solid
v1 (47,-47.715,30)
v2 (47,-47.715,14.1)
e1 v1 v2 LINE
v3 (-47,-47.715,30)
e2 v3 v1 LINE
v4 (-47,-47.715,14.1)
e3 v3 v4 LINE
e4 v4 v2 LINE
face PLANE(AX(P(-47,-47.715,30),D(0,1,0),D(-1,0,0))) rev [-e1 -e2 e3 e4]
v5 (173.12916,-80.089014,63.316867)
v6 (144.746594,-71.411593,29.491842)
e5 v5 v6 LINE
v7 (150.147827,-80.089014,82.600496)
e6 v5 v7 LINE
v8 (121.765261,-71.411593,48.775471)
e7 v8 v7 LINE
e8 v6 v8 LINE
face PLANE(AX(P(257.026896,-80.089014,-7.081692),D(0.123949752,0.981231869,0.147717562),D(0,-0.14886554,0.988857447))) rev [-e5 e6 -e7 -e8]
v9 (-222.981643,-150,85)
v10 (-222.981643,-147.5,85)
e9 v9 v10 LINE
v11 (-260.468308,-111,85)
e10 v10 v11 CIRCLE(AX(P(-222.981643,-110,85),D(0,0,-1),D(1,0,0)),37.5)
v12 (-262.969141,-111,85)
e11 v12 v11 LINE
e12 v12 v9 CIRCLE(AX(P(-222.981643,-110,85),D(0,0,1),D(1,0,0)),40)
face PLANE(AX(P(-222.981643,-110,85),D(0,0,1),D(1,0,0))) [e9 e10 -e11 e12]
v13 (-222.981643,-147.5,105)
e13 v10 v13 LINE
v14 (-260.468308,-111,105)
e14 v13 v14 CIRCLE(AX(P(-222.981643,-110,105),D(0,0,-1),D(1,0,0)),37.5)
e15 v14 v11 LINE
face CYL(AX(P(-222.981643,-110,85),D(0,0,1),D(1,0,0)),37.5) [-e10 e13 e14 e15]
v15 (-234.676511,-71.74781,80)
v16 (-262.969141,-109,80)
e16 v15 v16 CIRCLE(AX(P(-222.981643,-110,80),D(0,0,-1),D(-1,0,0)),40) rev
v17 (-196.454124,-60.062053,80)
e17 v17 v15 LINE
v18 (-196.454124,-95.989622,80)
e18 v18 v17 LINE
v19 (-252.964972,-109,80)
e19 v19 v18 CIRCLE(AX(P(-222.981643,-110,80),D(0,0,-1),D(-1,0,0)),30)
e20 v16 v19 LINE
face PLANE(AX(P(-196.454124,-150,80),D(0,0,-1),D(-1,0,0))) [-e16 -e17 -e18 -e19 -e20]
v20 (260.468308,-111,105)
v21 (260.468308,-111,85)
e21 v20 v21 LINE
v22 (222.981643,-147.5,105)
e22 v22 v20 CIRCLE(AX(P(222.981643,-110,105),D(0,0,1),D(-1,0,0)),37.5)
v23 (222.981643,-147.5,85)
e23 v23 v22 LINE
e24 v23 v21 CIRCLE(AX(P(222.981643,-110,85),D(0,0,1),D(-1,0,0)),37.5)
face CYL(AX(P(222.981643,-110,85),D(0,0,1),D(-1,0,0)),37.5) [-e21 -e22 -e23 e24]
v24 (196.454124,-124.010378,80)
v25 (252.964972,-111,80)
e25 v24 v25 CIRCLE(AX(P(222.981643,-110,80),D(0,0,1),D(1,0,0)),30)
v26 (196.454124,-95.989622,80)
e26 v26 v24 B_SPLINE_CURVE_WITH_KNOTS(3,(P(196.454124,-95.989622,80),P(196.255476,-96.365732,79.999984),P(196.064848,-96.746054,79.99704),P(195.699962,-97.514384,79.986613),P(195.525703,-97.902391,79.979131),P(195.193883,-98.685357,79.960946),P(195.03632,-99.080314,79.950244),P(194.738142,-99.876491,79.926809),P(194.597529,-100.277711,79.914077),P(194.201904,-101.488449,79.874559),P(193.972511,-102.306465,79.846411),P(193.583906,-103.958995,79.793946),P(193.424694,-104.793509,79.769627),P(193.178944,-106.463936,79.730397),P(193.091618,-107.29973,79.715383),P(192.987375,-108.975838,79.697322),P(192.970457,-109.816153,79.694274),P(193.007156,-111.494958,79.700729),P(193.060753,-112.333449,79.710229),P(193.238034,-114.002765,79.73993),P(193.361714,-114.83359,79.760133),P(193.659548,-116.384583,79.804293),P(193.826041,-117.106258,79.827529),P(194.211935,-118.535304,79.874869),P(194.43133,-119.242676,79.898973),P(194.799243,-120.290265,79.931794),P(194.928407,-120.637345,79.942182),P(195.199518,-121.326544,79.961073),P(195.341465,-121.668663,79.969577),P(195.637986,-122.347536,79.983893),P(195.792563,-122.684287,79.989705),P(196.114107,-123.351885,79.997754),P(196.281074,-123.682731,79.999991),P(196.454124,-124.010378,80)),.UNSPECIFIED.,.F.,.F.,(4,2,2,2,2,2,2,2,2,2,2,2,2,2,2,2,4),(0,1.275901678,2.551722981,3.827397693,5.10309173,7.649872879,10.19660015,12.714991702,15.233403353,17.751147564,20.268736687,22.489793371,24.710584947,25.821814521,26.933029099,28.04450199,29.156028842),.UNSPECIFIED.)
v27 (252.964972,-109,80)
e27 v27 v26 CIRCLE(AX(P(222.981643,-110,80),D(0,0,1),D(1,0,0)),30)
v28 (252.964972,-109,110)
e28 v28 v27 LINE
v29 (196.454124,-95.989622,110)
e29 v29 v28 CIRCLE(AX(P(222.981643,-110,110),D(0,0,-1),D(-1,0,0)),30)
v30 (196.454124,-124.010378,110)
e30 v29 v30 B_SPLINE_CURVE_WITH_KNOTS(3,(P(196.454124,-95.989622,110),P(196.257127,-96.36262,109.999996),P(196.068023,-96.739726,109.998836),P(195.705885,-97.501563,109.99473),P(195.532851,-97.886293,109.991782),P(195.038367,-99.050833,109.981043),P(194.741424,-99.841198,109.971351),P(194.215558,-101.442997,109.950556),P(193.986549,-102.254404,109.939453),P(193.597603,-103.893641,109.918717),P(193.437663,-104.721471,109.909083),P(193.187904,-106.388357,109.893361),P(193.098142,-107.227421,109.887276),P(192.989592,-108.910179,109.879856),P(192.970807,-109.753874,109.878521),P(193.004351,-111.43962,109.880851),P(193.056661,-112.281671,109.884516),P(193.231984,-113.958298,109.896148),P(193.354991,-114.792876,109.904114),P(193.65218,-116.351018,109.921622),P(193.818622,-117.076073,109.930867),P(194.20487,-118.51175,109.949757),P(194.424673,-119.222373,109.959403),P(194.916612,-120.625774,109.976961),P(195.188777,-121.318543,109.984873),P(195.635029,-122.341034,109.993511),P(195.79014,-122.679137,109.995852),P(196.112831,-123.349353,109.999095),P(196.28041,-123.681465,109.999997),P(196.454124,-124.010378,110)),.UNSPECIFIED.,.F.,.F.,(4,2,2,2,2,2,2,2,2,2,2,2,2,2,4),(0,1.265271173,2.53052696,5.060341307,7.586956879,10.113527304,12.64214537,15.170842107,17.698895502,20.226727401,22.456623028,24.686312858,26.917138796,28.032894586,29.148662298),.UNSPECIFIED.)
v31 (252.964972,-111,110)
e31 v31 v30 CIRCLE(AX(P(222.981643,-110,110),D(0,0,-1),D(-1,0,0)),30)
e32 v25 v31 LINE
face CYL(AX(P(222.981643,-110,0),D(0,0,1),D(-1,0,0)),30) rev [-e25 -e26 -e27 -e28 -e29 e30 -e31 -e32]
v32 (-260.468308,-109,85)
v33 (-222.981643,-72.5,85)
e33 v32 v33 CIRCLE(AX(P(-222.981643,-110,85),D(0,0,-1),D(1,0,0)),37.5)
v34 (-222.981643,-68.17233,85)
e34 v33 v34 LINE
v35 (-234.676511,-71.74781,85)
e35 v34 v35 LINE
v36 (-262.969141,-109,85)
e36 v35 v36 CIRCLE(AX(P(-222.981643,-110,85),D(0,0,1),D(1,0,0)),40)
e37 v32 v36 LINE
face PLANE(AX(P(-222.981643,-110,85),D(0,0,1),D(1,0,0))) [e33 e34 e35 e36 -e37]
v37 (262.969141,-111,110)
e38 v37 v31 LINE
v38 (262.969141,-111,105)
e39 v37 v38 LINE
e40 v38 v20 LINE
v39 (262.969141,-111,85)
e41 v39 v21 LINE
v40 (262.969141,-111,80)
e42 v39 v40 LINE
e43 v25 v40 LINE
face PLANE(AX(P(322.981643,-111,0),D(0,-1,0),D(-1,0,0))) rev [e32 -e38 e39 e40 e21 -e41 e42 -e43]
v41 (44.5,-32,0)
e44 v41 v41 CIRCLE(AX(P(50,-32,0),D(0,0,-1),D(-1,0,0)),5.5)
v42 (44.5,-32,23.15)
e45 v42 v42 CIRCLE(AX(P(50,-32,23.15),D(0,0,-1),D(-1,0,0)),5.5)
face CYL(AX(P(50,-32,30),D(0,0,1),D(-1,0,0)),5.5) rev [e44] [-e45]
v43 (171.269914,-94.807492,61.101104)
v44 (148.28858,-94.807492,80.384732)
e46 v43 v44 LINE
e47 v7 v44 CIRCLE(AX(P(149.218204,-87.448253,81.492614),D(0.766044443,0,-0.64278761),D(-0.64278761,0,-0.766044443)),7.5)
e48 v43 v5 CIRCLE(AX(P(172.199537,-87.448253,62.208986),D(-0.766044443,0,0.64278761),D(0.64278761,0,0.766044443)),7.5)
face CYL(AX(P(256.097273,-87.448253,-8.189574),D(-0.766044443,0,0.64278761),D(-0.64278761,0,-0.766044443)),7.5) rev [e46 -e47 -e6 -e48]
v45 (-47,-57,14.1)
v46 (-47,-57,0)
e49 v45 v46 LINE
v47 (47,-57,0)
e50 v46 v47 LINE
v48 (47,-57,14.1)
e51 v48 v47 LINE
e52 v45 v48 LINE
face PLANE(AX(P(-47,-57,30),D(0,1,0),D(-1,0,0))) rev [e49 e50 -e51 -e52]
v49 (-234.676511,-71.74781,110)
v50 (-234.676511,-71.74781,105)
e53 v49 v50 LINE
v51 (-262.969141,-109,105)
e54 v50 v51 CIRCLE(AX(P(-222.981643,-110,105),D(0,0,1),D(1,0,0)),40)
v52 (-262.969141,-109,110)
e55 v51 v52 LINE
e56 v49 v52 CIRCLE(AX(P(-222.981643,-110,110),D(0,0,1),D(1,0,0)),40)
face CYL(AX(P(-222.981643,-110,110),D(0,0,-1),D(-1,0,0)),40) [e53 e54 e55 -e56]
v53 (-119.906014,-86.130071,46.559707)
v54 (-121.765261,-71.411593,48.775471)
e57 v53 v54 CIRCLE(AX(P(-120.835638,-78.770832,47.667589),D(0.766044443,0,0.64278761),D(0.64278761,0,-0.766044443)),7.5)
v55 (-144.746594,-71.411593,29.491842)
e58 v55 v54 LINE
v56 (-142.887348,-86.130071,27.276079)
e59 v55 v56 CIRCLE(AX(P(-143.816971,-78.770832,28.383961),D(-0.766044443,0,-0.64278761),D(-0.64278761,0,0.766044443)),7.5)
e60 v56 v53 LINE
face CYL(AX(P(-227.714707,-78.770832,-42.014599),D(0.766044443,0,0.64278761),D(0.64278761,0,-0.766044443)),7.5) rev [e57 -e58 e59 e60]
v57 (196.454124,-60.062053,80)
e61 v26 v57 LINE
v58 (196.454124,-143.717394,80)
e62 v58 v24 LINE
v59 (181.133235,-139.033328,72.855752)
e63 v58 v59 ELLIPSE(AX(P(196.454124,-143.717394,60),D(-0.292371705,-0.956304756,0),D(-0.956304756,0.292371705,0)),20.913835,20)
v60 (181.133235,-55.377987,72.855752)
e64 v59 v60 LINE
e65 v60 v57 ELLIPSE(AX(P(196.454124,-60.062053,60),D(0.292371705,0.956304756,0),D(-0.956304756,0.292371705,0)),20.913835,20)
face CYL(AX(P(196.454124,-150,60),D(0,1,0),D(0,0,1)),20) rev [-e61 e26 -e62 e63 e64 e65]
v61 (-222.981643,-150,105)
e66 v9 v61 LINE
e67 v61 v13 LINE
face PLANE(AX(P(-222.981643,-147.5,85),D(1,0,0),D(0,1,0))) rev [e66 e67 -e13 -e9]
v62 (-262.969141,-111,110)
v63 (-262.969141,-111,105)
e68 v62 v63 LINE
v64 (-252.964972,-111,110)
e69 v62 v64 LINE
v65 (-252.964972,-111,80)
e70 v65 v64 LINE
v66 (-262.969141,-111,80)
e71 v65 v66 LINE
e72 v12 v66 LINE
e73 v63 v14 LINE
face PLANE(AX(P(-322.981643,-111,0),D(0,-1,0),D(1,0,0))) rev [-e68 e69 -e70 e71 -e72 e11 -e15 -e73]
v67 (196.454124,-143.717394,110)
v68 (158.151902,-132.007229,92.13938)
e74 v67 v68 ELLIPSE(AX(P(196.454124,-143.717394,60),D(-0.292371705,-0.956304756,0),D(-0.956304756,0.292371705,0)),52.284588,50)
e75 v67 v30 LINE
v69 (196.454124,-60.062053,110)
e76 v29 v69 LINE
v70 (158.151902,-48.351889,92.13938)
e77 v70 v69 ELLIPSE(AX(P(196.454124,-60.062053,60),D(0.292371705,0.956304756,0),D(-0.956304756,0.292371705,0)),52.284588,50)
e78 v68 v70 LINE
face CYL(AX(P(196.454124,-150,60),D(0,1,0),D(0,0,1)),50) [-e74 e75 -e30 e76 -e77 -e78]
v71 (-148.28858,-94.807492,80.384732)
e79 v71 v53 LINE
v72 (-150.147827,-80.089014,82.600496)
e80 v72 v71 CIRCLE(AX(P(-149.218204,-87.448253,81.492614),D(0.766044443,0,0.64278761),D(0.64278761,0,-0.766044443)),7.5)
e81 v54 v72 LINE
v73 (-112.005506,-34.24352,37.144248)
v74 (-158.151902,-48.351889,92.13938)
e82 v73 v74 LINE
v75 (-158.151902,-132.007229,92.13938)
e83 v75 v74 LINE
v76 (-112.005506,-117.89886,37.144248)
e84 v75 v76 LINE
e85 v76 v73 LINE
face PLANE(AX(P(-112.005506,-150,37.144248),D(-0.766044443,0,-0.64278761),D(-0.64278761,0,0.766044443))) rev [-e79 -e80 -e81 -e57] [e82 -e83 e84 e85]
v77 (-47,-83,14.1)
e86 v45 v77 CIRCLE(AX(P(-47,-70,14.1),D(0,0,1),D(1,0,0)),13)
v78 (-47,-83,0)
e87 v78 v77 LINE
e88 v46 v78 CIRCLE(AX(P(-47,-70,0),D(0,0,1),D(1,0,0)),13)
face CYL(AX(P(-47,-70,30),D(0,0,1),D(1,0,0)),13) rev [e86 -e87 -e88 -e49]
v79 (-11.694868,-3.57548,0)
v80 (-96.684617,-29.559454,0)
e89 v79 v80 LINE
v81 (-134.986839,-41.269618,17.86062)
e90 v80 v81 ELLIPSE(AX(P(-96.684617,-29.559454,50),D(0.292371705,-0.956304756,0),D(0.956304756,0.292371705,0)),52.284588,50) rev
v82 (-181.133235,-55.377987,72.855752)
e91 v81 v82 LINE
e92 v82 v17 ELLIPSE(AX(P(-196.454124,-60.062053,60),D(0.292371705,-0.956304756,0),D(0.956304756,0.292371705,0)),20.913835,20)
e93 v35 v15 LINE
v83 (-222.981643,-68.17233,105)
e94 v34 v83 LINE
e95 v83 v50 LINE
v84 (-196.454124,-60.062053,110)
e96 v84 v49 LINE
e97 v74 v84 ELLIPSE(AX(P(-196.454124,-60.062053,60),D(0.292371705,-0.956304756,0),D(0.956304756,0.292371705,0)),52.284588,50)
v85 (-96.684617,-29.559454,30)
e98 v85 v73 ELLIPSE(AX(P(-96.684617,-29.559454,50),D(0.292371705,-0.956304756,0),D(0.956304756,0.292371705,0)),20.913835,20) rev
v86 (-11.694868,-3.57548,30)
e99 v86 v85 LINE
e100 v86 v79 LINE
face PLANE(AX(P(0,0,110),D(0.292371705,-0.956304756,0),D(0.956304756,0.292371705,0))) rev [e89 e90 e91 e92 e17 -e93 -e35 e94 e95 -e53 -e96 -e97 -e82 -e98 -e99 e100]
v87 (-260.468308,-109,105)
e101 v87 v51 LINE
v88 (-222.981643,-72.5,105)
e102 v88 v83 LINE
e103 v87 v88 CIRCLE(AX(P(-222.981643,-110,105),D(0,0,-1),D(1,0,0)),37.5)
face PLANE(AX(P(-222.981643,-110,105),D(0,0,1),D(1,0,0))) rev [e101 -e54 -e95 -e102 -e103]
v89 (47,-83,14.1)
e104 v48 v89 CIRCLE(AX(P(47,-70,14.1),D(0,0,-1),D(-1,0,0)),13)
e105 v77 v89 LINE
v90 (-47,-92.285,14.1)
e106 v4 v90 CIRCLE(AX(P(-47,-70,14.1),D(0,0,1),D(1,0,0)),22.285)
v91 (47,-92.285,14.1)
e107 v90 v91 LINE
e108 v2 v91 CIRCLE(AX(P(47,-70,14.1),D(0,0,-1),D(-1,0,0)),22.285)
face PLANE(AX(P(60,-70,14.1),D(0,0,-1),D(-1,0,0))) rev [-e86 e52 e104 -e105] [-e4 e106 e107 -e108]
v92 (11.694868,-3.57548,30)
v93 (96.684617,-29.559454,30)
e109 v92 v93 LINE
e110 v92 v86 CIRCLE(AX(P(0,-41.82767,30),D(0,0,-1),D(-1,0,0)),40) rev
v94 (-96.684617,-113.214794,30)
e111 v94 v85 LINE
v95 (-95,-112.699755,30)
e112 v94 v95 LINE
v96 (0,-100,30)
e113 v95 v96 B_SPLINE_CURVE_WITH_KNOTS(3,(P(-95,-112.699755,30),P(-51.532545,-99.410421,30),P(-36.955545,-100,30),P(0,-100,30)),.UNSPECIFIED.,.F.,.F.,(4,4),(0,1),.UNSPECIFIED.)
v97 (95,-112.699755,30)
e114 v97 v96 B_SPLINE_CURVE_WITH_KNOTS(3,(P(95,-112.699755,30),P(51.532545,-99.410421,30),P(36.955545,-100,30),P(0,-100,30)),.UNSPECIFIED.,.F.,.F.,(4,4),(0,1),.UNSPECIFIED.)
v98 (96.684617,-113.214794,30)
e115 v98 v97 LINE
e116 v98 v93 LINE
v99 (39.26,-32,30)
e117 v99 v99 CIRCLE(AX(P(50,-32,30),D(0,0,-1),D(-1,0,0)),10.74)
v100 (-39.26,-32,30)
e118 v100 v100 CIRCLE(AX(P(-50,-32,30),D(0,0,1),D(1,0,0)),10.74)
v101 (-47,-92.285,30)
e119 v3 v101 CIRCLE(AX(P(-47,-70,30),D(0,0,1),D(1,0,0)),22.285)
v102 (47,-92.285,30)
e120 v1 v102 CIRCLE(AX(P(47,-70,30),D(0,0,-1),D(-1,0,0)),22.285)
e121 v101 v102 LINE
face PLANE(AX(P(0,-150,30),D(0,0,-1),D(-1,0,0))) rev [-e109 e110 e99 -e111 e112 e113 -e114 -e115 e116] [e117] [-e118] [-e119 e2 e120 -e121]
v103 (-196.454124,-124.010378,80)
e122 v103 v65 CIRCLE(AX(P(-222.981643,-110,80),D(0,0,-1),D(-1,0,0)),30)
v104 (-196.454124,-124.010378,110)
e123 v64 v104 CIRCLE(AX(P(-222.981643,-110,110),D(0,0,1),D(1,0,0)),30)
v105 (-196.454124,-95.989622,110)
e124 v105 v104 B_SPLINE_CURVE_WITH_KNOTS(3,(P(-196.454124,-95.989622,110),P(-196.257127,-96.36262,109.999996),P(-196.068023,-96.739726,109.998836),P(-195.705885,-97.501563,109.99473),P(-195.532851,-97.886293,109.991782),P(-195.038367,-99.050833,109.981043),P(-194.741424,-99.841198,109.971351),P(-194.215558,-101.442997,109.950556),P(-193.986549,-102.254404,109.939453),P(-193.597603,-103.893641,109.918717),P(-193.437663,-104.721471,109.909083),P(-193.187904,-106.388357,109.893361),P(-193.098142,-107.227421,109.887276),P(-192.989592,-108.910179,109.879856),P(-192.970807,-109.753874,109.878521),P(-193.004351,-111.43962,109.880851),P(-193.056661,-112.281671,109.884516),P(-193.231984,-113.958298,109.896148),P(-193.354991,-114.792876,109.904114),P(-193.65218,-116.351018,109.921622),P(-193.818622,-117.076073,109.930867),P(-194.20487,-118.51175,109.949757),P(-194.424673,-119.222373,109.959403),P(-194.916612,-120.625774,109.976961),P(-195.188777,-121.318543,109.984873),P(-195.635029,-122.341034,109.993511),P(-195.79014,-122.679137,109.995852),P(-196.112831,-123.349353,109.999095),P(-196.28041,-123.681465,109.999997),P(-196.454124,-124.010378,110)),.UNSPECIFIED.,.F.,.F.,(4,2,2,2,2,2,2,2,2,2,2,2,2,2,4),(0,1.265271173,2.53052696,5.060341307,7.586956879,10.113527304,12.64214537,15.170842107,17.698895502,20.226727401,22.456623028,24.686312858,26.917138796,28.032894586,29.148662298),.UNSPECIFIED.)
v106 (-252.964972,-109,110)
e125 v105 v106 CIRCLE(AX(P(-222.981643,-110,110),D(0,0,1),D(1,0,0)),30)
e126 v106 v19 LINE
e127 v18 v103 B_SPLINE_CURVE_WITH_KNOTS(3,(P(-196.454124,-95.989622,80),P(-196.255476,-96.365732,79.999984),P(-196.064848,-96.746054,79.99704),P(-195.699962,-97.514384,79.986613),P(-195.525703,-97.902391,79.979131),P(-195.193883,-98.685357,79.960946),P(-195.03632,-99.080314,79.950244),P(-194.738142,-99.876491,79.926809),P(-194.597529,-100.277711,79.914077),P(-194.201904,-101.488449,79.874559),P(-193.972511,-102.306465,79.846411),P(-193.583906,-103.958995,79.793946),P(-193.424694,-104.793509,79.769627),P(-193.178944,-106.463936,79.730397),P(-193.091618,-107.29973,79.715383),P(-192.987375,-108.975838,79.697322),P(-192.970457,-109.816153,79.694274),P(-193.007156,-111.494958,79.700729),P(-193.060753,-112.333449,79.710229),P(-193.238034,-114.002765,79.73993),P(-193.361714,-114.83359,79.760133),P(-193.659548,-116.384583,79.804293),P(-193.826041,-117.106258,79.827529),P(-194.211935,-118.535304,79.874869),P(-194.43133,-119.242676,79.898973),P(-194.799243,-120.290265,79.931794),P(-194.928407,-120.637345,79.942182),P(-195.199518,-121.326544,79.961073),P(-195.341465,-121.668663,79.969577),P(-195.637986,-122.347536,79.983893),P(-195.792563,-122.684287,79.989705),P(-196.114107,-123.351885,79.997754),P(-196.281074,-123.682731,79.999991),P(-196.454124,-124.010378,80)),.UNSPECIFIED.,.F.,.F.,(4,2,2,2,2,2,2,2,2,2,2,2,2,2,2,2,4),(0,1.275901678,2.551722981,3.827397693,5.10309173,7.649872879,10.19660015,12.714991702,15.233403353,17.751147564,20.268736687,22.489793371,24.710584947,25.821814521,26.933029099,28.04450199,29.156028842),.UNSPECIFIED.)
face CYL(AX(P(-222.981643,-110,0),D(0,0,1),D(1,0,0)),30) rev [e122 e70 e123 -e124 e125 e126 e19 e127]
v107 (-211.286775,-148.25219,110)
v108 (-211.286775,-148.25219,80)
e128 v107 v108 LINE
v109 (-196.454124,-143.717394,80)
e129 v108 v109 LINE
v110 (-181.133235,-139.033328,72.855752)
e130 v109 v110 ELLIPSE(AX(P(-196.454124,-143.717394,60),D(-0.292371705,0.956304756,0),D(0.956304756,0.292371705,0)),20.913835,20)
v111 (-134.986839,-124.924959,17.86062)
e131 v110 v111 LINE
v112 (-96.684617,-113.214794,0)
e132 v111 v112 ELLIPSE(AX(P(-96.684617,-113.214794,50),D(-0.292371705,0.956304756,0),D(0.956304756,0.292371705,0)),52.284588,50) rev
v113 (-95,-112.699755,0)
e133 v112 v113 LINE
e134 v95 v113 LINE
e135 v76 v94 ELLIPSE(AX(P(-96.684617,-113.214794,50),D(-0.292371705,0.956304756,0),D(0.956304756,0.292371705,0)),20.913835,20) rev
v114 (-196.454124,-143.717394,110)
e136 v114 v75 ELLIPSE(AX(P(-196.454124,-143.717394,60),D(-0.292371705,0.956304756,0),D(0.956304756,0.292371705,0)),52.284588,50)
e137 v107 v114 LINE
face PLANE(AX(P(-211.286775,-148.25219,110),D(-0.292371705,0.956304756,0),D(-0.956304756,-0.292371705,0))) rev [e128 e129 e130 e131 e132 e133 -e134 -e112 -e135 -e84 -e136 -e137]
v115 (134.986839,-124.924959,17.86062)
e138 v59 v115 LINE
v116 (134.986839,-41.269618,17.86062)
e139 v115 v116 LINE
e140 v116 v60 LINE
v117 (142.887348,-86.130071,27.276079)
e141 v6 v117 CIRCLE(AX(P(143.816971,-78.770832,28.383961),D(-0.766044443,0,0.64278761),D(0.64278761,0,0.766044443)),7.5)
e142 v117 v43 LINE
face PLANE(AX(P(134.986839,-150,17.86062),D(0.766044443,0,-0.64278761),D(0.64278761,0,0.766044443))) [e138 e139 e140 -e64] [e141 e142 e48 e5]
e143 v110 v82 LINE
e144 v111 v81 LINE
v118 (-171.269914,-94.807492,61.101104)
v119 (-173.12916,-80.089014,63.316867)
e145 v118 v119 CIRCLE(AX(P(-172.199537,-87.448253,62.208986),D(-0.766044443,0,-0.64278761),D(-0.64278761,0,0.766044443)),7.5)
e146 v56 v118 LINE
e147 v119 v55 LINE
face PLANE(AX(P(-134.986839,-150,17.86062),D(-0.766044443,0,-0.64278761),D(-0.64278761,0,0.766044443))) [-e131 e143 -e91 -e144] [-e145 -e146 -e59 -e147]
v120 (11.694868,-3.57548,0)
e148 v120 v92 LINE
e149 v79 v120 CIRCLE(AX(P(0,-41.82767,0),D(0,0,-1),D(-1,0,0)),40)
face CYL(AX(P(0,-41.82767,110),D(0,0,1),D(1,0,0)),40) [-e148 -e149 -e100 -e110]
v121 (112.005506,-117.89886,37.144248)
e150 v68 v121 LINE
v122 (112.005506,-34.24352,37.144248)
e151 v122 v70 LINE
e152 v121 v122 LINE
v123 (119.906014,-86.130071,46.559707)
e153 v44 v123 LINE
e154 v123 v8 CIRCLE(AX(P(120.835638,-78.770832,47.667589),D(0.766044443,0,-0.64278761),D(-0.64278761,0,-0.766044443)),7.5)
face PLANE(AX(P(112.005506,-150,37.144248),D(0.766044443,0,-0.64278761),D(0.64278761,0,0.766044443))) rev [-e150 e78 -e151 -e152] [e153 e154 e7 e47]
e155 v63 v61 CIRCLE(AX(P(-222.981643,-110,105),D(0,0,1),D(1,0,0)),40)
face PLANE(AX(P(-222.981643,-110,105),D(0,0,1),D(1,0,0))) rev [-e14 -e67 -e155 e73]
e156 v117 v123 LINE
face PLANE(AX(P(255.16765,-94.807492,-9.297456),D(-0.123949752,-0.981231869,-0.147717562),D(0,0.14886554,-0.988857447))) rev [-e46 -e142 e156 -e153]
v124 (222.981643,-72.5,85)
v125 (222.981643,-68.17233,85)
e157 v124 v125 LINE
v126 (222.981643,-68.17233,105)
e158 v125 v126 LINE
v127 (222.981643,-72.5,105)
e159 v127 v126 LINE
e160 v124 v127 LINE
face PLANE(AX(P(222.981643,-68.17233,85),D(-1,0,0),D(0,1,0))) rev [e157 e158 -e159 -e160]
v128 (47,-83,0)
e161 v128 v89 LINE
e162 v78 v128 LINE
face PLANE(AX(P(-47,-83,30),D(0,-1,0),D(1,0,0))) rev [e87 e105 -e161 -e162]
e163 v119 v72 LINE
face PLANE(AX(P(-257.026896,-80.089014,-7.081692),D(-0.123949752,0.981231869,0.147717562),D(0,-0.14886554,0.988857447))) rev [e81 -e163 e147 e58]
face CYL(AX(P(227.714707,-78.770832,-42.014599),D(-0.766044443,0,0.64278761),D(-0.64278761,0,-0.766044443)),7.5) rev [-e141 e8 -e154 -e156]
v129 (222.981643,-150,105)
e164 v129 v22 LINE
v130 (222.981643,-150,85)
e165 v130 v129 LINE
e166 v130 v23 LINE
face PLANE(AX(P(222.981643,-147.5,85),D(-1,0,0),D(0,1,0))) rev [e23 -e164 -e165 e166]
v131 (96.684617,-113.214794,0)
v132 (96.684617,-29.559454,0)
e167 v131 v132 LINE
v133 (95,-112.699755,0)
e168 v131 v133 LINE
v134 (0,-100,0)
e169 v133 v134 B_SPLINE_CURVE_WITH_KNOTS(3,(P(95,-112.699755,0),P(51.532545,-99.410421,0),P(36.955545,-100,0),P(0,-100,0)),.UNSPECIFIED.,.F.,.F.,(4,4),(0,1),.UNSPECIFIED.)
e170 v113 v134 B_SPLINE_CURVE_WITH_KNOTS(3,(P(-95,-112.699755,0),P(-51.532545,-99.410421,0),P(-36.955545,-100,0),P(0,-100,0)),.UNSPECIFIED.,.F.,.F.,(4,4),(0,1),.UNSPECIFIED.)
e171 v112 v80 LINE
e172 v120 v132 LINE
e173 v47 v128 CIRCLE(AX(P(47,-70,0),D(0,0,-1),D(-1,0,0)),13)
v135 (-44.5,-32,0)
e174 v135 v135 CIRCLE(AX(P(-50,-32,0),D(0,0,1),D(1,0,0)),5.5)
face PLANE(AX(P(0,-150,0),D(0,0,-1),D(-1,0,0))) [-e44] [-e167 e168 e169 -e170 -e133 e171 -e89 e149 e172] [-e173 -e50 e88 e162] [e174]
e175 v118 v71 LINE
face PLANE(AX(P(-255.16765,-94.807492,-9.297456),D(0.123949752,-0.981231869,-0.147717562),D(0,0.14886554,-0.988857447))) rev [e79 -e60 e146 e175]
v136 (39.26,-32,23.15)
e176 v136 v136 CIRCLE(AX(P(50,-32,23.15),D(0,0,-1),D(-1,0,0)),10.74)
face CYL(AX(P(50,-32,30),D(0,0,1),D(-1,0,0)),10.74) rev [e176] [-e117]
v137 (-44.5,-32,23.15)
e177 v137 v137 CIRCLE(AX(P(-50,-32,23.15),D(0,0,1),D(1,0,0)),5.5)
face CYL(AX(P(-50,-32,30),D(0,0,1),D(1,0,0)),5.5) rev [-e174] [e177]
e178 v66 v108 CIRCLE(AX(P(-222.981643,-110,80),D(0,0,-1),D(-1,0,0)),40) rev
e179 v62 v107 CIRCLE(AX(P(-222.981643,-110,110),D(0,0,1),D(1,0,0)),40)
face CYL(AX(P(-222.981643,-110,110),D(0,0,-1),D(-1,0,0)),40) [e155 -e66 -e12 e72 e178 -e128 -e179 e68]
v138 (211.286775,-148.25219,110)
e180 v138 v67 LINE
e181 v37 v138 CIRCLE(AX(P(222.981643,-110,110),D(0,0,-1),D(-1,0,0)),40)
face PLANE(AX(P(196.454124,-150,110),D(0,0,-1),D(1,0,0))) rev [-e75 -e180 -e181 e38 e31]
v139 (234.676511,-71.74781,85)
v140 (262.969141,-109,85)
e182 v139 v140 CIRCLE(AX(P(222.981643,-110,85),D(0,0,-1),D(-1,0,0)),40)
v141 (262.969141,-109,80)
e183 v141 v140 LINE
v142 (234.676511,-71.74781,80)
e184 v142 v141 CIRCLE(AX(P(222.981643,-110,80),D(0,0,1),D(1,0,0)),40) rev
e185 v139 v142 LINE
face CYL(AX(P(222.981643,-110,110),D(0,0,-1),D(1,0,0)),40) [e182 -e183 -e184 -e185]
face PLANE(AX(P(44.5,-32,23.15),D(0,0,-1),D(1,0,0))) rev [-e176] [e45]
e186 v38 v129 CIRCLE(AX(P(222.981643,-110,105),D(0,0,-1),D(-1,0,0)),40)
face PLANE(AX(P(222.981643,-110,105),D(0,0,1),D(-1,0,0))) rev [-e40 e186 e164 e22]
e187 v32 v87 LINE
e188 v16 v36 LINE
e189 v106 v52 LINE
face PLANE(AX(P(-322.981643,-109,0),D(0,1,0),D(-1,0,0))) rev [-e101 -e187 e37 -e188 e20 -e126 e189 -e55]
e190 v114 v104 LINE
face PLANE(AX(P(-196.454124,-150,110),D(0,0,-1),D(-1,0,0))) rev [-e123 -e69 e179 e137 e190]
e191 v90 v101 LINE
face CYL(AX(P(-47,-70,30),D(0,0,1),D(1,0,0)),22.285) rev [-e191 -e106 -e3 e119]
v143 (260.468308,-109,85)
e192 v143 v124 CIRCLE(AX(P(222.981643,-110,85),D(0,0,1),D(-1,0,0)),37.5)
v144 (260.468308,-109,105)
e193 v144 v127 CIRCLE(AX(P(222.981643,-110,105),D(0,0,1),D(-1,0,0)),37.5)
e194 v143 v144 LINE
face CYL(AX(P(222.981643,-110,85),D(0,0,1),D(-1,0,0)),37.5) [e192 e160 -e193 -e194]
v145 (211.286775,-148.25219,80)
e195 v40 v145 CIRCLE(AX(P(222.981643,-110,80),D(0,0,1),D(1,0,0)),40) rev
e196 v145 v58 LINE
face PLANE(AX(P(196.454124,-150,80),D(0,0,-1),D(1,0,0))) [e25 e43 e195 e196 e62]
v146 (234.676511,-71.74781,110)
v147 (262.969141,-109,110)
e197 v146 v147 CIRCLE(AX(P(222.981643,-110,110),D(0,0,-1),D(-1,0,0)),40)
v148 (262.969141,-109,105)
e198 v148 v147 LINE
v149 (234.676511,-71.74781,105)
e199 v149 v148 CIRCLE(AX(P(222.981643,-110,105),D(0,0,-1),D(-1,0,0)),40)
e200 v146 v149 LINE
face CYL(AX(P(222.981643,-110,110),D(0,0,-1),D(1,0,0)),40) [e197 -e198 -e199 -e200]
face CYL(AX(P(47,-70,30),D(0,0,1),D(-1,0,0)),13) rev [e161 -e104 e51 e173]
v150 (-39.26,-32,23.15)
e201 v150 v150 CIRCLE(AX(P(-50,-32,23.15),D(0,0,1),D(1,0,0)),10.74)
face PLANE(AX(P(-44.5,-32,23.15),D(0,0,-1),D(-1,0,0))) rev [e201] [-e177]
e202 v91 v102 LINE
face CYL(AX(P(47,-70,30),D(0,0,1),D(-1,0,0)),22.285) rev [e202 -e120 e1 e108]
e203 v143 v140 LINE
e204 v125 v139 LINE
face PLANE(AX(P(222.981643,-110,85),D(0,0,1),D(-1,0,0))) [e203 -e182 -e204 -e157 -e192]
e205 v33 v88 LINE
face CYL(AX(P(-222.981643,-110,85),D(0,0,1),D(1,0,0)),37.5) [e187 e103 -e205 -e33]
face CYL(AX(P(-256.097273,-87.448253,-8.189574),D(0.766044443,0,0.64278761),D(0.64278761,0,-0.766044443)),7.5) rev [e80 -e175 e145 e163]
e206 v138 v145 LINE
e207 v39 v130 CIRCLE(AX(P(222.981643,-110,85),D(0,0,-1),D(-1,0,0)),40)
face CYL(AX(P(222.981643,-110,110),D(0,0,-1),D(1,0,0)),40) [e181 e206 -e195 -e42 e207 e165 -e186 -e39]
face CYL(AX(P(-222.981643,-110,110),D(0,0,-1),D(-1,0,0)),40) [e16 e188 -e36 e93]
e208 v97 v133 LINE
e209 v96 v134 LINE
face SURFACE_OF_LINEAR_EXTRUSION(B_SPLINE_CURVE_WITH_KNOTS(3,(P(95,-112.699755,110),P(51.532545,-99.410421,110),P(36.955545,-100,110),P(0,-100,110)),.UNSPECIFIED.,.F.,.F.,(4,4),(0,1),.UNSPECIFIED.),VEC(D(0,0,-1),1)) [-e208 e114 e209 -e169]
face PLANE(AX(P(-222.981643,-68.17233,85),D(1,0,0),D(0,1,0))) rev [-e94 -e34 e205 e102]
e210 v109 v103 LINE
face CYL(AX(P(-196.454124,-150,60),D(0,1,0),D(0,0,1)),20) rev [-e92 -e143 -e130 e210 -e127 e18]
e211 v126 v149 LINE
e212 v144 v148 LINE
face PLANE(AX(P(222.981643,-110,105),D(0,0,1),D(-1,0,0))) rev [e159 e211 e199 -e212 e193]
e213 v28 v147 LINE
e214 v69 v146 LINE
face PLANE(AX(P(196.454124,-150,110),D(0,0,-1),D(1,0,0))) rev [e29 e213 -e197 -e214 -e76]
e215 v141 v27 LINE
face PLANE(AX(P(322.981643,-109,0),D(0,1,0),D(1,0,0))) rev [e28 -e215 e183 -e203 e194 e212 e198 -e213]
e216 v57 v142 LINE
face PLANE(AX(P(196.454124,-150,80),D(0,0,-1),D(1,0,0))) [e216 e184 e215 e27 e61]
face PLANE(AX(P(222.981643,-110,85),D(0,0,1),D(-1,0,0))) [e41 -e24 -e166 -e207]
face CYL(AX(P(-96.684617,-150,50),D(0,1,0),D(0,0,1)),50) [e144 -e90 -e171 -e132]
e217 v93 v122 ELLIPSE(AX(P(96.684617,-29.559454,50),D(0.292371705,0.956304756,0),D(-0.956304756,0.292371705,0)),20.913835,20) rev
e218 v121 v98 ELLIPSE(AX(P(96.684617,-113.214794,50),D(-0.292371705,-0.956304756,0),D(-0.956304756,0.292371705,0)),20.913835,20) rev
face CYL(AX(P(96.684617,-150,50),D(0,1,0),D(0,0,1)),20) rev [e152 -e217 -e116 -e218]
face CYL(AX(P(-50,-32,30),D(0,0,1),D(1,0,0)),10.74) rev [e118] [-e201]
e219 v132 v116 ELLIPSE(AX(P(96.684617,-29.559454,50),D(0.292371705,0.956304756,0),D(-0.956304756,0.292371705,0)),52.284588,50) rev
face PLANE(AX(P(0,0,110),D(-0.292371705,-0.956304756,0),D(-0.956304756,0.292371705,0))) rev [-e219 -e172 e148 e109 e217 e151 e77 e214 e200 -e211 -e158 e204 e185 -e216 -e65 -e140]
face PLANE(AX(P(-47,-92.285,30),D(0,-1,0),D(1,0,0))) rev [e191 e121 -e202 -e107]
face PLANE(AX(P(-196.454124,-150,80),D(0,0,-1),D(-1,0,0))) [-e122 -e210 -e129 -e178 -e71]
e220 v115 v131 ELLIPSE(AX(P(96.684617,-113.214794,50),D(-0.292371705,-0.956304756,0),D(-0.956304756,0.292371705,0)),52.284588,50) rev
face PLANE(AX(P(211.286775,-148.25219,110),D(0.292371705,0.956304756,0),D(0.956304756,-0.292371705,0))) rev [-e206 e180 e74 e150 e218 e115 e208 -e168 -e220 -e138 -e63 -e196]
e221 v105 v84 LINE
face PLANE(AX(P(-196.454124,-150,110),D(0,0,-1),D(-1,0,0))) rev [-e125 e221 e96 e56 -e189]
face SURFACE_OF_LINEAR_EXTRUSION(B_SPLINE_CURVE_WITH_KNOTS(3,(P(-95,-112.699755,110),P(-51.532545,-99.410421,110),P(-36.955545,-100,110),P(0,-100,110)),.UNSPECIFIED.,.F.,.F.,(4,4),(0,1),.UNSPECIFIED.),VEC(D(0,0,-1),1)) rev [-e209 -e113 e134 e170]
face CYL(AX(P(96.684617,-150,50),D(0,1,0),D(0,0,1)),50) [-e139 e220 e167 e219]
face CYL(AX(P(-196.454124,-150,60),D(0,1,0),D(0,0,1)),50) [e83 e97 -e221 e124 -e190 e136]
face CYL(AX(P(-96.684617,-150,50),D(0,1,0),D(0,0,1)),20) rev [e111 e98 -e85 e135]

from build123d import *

# Parameters (mm, degrees)
EXTRUDE_THIN1_DEPTH                       = 150
SKETCH2_OUTSIDE_W                         = 349.23
SKETCH2_OUTSIDE_H                         = 219.23
CUT_EXTRUDE1_DEPTH                        = 337.154726279
SKETCH3_R                                 = 30
CUT_EXTRUDE2_DEPTH                        = 323.116973634
CUT_EXTRUDE3_START                        = -15
CUT_EXTRUDE3_DEPTH                        = 10
SKETCH5_W                                 = 100
SKETCH5_H                                 = 2
CUT_EXTRUDE4_DEPTH                        = 323.116973634
CBORE_START                               = 14.1
CBORE_SLOT_FOR_M24_HEX_HEAD_BOLT1_DEPTH   = 15.9
CBORE_SLOT_FOR_M24_HEX_HEAD_BOLT1_2_DEPTH = 14.1
CBORE_FOR_M10_HEX_HEAD_BOLT1_D            = 11
CBORE_FOR_M10_HEX_HEAD_BOLT1_CBORE_D      = 21.48
CBORE_FOR_M10_HEX_HEAD_BOLT1_CBORE_DEPTH  = 6.85
CUT_EXTRUDE5_DEPTH                        = 303.31664336
FILLET1_R                                 = 40


# Read off the part's stored shape, not the designer's step: CBORE SLOT for M24 Hex Head Bolt1
with BuildPart() as part:
    # Sketch1 → Extrude-Thin1 (new body)
    with BuildSketch(Plane(origin=(0, 0, 0), x_dir=(1, 0, 0), z_dir=(0, 1, 0))):
        with BuildLine():
            Line((0, 0), (-96.684617092, 0))
            ThreePointArc((-96.684617092, 0), (-117.815530179, -4.684610648), (-134.986839248, -17.860619516))
            Line((-134.986839248, -17.860619516), (-181.133234795, -72.855752194))
            ThreePointArc((-181.133234795, -72.855752194), (-188.001758422, -78.126155741), (-196.454123657, -80))
            Line((-196.454123657, -80), (-280, -80))
            Line((-280, -80), (-280, -110))
            Line((-280, -110), (-196.454123657, -110))
            ThreePointArc((-196.454123657, -110), (-175.32321057, -105.315389352), (-158.151901501, -92.139380484))
            Line((-158.151901501, -92.139380484), (-112.005505955, -37.144247806))
            ThreePointArc((-112.005505955, -37.144247806), (-105.136982327, -31.873844259), (-96.684617092, -30))
            Line((-96.684617092, -30), (0, -30))
            Line((0, -30), (0, 0))
        make_face()
    extrude(amount=-EXTRUDE_THIN1_DEPTH)

    # Sketch2 outside → Cut-Extrude1 (cut, through all)
    with BuildSketch(Plane.XY):
        with Locations((-140, -75)):
            Rectangle(SKETCH2_OUTSIDE_W, SKETCH2_OUTSIDE_H)
        with BuildLine():
            Line((0, 0), (-234.676511429, -71.747809761))
            ThreePointArc((-234.676511429, -71.747809761), (-261.233833478, -121.694868189), (-211.286775051, -148.252190239))
            Line((-211.286775051, -148.252190239), (-95, -112.699755258))
            add(Edge.make_bspline(
                [(-95, -112.699755258), (-51.532544729, -99.410420536), (-36.95554526, -100), (0, -100)],
                knots=[0, 0, 0, 0, 1, 1, 1, 1], degree=3))
            Line((0, -100), (0, 0))
        make_face(mode=Mode.SUBTRACT)
    extrude(amount=CUT_EXTRUDE1_DEPTH, mode=Mode.SUBTRACT)

    # Sketch3 → Cut-Extrude2 (cut, through all)
    with BuildSketch(Plane.XY.offset(110)):
        with Locations(Location((-222.98164324, -110, 0), (0, 0, 27.840553026))):
            Circle(SKETCH3_R)
    extrude(amount=-CUT_EXTRUDE2_DEPTH, mode=Mode.SUBTRACT)

    # Sketch4 → Cut-Extrude3 (cut, symmetric)
    with BuildSketch(Plane.XY.offset(110).offset(CUT_EXTRUDE3_START)):
        with BuildLine():
            Line((-222.98164324, -68.172329741), (-222.98164324, -72.5))
            ThreePointArc((-222.98164324, -72.5), (-260.48164324, -110), (-222.98164324, -147.5))
            Line((-222.98164324, -147.5), (-222.98164324, -150))
            ThreePointArc((-222.98164324, -150), (-262.542277774, -115.912376445), (-234.676511429, -71.747809761))
            Line((-234.676511429, -71.747809761), (-222.98164324, -68.172329741))
        make_face()
    extrude(amount=CUT_EXTRUDE3_DEPTH, both=True, mode=Mode.SUBTRACT)

    # Sketch5 → Cut-Extrude4 (cut, through all)
    with BuildSketch(Plane.XY.offset(110)):
        with Locations((-272.98164324, -110)):
            Rectangle(SKETCH5_W, SKETCH5_H)
    extrude(amount=-CUT_EXTRUDE4_DEPTH, mode=Mode.SUBTRACT)

    # CBORE SLOT for M24 Hex Head Bolt1 outlin → CBORE SLOT for M24 Hex Head Bolt1 (cut)
    with BuildSketch(Plane.XY.offset(CBORE_START)):
        with BuildLine():
            Line((0, -47.715), (-47, -47.715))
            ThreePointArc((-47, -47.715), (-69.285, -70), (-47, -92.285))
            Line((-47, -92.285), (0, -92.285))
            Line((0, -92.285), (0, -47.715))
        make_face()
    extrude(amount=CBORE_SLOT_FOR_M24_HEX_HEAD_BOLT1_DEPTH, mode=Mode.SUBTRACT)

    # CBORE SLOT for M24 Hex Head Bolt1 2 outl → CBORE SLOT for M24 Hex Head Bolt1 2 (cut)
    with BuildSketch(Plane.XY):
        with BuildLine():
            Line((0, -83), (0, -57))
            Line((0, -57), (-47, -57))
            ThreePointArc((-47, -57), (-60, -70), (-47, -83))
            Line((-47, -83), (0, -83))
        make_face()
    extrude(amount=CBORE_SLOT_FOR_M24_HEX_HEAD_BOLT1_2_DEPTH, mode=Mode.SUBTRACT)

    # CBORE for M10 Hex Head Bolt1 (through all)
    with Locations(Plane.XY.offset(30)):
        with Locations((-50, -32)):
            CounterBoreHole(CBORE_FOR_M10_HEX_HEAD_BOLT1_D / 2, CBORE_FOR_M10_HEX_HEAD_BOLT1_CBORE_D / 2, CBORE_FOR_M10_HEX_HEAD_BOLT1_CBORE_DEPTH)

    # Sketch11 → Cut-Extrude5 (cut, through all)
    with BuildSketch(Plane(origin=(-47.437557366, 0, -39.80483689), x_dir=(0.6427876096865384, 0, -0.7660444431189788), z_dir=(0.7660444431189788, 0, 0.6427876096865384))):
        with BuildLine():
            Line((-159.78881321, -80.089014291), (-115.633379107, -71.411593064))
            ThreePointArc((-115.633379107, -71.411593064), (-106.827903218, -77.32459521), (-112.740905364, -86.130071099))
            Line((-112.740905364, -86.130071099), (-156.896339468, -94.807492326))
            ThreePointArc((-156.896339468, -94.807492326), (-165.701815356, -88.89449018), (-159.78881321, -80.089014291))
        make_face()
    extrude(amount=-CUT_EXTRUDE5_DEPTH, mode=Mode.SUBTRACT)

    # Mirror1: part across plane


with BuildPart() as part_1:
    add(part.part)
    add(part.part.mirror(Plane(origin=(0, -150, 0), x_dir=(0, 0, 1), z_dir=(-1, 0, 0))))

    # Fillet1
    fillet1_edges = [part_1.edges().sort_by_distance(p)[0] for p in [
        (0, 0, 15),
    ]]
    fillet(fillet1_edges, radius=FILLET1_R)


solid = part_1.part
